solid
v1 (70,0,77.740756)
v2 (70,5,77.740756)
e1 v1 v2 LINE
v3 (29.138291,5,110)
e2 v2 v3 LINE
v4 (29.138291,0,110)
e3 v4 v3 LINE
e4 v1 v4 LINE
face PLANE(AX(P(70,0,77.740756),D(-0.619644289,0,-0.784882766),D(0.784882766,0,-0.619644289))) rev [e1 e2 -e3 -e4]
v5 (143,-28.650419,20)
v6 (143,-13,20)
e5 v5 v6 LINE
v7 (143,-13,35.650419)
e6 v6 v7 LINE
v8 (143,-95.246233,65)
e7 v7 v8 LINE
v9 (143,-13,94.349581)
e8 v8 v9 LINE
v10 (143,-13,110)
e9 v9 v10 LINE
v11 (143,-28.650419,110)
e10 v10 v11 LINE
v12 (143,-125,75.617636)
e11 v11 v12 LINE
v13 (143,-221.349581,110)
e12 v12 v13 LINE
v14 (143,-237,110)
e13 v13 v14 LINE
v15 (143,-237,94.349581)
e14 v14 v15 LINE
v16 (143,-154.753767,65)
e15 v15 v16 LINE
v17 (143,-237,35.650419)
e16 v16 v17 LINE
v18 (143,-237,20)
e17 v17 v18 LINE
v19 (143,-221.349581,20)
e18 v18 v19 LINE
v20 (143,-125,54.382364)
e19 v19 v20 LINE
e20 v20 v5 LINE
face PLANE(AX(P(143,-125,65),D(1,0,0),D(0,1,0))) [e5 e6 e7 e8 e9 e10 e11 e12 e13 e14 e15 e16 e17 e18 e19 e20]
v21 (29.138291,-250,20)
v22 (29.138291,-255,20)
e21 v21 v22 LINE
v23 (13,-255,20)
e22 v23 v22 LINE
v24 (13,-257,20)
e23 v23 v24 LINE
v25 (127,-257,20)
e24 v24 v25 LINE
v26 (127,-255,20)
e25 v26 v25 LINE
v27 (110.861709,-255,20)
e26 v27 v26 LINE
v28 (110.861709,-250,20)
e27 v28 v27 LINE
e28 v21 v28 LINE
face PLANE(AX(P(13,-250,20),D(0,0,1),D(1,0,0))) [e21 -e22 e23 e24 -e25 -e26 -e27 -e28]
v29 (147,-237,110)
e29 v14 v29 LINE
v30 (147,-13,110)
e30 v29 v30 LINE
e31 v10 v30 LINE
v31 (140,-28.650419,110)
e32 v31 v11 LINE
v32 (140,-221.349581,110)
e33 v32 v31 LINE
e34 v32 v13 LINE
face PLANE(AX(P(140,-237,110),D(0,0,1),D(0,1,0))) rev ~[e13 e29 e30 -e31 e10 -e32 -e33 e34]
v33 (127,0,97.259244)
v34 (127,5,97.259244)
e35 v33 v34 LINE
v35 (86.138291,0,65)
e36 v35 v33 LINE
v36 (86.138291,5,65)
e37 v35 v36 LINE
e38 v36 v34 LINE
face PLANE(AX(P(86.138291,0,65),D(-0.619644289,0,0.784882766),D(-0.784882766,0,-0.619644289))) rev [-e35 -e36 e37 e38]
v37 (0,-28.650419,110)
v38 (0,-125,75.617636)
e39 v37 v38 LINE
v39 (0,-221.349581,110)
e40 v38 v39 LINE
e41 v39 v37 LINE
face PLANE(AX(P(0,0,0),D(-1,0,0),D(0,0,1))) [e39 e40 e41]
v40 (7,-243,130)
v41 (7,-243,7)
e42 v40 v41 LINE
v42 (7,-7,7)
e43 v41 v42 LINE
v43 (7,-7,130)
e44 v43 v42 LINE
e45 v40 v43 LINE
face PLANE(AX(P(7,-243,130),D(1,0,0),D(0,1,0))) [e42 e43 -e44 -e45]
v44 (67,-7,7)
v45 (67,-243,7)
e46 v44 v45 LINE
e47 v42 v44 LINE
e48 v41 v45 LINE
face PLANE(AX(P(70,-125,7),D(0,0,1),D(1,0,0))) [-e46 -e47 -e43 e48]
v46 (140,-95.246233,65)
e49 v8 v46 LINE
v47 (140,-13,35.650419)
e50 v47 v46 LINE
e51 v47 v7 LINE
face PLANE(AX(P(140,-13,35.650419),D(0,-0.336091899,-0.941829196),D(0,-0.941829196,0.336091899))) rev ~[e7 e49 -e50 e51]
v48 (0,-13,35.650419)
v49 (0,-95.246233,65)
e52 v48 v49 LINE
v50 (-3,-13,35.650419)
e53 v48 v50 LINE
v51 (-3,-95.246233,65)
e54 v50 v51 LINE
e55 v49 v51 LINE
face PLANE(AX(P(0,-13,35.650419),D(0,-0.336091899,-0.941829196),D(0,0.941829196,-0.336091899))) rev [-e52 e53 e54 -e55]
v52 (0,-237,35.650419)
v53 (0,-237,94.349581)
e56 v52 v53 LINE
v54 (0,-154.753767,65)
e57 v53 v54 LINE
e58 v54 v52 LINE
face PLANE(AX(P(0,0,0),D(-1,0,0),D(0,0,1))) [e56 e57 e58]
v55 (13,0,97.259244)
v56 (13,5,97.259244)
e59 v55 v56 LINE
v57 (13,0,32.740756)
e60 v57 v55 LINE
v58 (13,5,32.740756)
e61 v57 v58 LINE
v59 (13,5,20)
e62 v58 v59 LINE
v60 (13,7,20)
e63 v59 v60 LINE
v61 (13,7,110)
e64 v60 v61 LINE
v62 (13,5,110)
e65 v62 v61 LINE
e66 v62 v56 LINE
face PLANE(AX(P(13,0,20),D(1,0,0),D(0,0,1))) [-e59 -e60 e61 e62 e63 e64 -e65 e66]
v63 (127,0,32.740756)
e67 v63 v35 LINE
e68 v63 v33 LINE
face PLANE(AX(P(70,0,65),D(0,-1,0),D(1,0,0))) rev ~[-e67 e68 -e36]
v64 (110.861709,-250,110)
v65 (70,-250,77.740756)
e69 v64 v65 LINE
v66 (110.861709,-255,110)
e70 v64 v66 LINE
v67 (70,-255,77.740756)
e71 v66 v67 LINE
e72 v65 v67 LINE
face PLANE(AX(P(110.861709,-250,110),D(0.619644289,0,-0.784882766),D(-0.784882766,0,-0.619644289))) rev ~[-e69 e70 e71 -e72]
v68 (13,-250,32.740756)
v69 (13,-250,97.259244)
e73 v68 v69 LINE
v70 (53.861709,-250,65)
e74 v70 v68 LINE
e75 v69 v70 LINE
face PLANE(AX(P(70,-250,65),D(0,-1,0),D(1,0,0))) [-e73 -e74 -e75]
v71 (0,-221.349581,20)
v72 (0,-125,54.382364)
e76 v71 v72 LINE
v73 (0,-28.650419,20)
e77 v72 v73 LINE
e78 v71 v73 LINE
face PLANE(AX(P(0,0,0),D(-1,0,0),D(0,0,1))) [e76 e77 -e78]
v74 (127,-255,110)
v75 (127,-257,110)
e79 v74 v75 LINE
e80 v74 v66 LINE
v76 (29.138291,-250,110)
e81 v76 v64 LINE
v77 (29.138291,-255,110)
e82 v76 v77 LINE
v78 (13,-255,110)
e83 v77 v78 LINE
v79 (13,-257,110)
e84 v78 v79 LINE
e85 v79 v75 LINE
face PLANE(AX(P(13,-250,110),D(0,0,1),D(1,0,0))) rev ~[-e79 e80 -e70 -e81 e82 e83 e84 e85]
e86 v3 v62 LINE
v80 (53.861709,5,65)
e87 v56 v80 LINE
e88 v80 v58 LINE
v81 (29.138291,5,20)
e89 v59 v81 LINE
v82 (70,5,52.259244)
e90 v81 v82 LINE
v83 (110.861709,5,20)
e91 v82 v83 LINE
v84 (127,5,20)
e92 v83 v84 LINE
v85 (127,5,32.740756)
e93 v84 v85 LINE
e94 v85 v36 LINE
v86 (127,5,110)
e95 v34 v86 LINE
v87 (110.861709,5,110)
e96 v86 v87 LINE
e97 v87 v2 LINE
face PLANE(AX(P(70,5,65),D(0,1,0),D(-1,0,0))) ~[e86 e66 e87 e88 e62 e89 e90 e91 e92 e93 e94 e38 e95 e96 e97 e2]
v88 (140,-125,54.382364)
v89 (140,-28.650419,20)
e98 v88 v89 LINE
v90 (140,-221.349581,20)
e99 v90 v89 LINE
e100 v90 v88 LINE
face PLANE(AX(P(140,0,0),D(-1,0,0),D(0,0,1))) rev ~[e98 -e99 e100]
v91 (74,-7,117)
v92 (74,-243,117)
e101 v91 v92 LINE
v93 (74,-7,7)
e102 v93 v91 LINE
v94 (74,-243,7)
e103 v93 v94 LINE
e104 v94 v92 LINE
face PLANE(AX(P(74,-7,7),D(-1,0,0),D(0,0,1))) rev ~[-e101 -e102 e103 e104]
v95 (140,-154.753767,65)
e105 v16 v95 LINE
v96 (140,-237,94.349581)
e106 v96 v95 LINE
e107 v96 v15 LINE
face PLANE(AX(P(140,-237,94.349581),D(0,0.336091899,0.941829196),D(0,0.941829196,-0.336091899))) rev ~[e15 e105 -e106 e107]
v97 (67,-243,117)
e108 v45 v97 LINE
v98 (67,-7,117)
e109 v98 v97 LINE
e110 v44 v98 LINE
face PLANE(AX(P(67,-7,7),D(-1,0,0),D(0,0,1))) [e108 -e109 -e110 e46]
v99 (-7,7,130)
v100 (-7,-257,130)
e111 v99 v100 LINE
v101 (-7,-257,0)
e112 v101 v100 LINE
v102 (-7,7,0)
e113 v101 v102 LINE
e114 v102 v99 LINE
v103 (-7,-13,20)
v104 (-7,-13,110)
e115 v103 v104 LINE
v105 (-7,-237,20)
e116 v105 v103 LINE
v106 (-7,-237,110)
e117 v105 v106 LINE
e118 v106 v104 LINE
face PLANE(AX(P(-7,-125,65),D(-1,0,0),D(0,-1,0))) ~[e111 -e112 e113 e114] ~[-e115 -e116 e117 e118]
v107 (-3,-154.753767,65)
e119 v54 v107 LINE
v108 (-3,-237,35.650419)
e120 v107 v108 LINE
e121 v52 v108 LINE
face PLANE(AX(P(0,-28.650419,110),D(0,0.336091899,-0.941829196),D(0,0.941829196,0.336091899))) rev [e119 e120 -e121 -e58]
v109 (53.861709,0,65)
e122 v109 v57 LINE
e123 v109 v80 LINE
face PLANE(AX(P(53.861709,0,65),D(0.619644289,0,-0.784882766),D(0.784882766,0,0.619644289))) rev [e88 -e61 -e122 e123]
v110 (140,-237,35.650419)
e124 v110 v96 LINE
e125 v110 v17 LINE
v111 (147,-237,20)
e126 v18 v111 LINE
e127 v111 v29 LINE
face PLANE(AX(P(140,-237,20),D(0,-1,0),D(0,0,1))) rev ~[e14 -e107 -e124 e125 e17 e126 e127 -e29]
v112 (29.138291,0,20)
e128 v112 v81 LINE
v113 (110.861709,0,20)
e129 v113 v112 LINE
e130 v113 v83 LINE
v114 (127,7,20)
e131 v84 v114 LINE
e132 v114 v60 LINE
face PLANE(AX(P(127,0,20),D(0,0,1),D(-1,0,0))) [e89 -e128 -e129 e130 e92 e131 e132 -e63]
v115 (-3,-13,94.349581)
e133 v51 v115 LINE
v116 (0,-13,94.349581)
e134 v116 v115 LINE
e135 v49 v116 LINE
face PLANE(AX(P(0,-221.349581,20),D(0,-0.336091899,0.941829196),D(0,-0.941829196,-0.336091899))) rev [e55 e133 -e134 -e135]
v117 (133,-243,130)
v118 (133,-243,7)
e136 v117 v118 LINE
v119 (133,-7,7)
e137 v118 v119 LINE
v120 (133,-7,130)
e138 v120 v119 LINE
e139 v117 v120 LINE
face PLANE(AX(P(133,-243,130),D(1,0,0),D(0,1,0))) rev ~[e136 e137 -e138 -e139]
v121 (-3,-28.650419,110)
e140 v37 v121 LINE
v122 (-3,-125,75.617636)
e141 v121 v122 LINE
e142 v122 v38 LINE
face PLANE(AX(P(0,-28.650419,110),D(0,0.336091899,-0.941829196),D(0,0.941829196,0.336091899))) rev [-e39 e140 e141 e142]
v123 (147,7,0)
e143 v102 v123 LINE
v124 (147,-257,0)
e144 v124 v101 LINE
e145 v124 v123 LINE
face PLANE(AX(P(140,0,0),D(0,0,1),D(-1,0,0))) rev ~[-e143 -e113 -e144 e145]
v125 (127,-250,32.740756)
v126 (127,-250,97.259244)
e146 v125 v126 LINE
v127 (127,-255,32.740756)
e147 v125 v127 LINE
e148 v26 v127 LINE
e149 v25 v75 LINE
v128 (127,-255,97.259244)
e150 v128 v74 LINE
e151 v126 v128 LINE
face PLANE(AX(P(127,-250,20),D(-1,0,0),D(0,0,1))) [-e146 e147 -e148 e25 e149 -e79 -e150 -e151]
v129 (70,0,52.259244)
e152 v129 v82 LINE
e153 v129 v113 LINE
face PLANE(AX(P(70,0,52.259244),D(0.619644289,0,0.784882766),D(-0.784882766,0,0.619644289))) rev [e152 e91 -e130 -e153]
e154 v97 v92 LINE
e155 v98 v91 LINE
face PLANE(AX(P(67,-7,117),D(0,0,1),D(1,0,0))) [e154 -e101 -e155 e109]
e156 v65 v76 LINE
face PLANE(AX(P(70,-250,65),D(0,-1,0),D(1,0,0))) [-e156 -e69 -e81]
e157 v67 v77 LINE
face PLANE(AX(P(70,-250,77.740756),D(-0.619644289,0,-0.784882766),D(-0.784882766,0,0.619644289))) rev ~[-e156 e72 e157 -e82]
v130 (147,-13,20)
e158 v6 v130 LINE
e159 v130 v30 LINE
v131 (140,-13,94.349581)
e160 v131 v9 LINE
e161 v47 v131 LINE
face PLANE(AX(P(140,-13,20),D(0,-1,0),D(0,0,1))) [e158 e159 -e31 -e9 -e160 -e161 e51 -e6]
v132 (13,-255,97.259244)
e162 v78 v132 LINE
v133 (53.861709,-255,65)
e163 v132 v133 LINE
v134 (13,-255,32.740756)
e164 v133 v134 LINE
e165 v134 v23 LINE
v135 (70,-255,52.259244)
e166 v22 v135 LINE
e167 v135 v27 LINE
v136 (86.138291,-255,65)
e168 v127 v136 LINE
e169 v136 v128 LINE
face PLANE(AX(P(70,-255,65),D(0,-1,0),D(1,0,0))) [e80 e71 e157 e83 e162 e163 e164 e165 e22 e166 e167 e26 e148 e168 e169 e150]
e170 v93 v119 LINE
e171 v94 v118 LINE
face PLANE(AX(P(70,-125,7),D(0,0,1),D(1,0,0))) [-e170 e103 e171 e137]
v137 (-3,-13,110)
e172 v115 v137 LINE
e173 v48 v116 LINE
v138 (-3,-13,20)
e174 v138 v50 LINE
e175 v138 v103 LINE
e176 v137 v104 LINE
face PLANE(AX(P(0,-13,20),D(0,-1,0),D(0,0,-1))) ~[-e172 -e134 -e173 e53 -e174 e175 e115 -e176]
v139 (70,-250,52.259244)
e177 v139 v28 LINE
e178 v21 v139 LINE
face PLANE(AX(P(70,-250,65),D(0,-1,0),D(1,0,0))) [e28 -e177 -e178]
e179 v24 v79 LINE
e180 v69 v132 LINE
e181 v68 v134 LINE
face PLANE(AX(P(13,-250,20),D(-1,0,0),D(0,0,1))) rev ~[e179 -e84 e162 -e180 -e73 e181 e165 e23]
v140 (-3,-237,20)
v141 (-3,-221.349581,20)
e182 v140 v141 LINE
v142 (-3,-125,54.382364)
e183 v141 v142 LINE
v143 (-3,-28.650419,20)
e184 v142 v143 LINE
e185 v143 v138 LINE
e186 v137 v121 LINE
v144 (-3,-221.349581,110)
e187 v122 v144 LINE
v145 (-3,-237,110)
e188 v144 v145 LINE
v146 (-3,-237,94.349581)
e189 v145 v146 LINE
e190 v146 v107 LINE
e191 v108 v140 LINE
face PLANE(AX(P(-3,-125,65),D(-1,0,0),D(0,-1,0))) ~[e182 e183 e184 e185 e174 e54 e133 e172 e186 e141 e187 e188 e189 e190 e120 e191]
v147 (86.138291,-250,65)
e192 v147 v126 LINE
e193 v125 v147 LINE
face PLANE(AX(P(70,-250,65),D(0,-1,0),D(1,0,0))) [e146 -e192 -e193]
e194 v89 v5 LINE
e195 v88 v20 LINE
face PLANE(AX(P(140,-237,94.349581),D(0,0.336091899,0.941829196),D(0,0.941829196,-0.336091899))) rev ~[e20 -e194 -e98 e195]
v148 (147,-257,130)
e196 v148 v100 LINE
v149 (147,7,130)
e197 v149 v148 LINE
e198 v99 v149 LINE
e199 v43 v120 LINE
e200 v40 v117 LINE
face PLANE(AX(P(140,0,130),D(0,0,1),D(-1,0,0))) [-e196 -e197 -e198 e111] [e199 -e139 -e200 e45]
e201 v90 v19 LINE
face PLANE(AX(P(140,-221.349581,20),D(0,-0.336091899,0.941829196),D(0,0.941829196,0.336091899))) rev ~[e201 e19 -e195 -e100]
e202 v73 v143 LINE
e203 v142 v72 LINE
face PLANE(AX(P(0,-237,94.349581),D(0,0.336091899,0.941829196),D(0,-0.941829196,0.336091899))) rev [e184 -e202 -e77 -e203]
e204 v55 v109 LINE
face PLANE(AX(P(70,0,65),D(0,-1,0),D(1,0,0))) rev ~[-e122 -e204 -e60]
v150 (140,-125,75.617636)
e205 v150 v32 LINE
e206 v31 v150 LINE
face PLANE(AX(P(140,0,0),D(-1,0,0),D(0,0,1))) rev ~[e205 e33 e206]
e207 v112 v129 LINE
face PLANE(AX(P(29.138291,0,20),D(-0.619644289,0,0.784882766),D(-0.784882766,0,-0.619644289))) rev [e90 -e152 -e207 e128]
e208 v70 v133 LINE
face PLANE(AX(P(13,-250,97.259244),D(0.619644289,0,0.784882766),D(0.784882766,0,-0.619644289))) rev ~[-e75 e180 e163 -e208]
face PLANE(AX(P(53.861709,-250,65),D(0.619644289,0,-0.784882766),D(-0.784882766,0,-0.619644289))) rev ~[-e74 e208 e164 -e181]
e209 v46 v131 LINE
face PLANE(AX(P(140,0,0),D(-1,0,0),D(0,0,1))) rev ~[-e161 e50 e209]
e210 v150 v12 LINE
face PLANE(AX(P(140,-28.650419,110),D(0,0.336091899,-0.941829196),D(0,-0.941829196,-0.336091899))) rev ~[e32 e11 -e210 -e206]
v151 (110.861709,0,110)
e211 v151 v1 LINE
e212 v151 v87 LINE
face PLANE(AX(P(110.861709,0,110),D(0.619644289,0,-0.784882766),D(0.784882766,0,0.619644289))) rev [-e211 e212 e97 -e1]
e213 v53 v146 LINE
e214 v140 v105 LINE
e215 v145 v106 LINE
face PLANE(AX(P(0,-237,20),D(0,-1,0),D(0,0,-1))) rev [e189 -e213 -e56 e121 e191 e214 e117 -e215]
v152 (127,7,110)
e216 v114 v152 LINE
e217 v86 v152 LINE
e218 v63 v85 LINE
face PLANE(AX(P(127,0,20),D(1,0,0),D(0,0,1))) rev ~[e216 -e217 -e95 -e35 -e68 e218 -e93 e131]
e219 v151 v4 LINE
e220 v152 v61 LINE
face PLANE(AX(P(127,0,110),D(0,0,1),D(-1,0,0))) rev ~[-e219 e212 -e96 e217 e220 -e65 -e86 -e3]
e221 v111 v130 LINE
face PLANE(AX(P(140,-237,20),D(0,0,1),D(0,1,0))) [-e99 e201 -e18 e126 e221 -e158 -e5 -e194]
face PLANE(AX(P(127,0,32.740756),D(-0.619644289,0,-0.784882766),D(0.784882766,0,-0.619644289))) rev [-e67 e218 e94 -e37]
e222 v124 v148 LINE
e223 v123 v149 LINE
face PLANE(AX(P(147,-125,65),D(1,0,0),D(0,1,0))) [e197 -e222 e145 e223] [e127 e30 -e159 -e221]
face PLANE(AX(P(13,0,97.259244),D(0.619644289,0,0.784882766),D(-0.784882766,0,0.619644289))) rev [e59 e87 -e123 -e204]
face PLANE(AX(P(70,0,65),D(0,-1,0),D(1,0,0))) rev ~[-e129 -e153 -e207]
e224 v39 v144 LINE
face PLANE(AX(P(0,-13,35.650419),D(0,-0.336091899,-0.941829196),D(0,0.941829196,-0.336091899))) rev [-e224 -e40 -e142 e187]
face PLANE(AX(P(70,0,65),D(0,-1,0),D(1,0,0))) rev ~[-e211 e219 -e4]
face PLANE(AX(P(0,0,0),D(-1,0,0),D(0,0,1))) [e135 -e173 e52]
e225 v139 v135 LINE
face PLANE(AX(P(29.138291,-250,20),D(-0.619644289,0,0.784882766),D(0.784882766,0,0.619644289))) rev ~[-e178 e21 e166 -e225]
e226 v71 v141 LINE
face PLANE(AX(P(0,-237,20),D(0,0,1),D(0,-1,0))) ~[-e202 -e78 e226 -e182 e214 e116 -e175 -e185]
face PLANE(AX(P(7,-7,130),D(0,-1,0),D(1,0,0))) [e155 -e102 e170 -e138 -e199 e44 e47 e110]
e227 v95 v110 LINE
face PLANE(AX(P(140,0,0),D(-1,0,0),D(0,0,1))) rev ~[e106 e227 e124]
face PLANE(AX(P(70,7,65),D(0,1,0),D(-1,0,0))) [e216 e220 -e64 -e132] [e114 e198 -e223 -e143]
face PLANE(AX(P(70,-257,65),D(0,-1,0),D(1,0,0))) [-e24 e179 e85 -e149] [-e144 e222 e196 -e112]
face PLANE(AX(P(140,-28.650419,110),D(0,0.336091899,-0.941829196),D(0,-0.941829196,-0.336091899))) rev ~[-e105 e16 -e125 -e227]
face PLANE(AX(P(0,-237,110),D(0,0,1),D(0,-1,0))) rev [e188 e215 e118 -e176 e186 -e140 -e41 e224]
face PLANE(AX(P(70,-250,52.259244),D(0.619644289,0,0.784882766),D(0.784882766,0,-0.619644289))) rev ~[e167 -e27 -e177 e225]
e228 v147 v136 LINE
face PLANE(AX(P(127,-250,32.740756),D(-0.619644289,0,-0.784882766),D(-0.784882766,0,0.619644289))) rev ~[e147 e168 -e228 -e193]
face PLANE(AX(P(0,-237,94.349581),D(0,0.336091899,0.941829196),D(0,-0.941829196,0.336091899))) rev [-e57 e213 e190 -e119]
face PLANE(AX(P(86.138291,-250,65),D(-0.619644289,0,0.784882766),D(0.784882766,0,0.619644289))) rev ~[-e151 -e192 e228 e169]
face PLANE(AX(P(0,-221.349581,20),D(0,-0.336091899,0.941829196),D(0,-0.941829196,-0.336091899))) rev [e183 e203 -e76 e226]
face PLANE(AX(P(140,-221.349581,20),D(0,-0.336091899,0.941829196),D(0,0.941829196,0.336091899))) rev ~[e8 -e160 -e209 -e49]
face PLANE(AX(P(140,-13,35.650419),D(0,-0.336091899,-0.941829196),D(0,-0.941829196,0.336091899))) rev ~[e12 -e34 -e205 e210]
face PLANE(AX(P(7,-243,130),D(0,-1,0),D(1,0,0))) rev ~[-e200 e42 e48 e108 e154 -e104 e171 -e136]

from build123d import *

# Parameters (mm, degrees)
F0_W      = 140
F0_H      = 130
F1_DEPTH  = 250
F2_W      = 126
F2_H      = 236
F3_DEPTH  = 123
F4_W      = 250
F4_H      = 130
F4_W_2    = 224
F4_H_2    = 90
F4_W_3    = 7
F5_DEPTH  = 7
F7_W      = 140
F7_H      = 130
F7_W_2    = 114
F7_H_2    = 90
F8_DEPTH  = 7
F9_W      = 140
F9_H      = 130
F9_W_2    = 114
F9_H_2    = 90
F10_DEPTH = 7
F12_DEPTH = 3
F14_DEPTH = 3
F15_W     = 7
F15_H     = 110
F16_DEPTH = 236
F18_DEPTH = 5


# Not quite as in the source:
# - a pattern or mirror of a feature is missing from the dataset's text; its kind, count and spacing are read off the source's solid


with BuildPart() as f1:
    # F0 (on Front) → F1 (new body)
    with BuildSketch(Plane.XZ):
        with Locations((70, 65)):
            Rectangle(F0_W, F0_H)
    extrude(amount=F1_DEPTH)

    # F2 (on face) → F3 (cut)
    with BuildSketch(Plane.XY.offset(130)):
        with Locations((70, -125)):
            Rectangle(F2_W, F2_H)
    extrude(amount=-F3_DEPTH, mode=Mode.SUBTRACT)

    # F4 (on face) → F5 (join)
    with BuildSketch(Plane.YZ.offset(140)):
        with Locations((-125, 65)):
            Rectangle(F4_W, F4_H)
        with Locations((-125, 65)):
            Rectangle(F4_W_2, F4_H_2, mode=Mode.SUBTRACT)
        with Locations((-253.5, 65)):
            Rectangle(F4_W_3, F4_H)
        with Locations((3.5, 65)):
            Rectangle(F4_W_3, F4_H)
    f5 = extrude(amount=F5_DEPTH)

    # F5_copies: F5 across plane
    add(f5.mirror(Plane(origin=(70, 0, 0), x_dir=(0, 0, -1), z_dir=(-1, 0, 0))))

    # F7 (on face) → F8 (join)
    with BuildSketch(Plane.XZ.offset(250)):
        with Locations((70, 65)):
            Rectangle(F7_W, F7_H)
        with Locations((70, 65)):
            Rectangle(F7_W_2, F7_H_2, mode=Mode.SUBTRACT)
    extrude(amount=F8_DEPTH)

    # F9 (on face) → F10 (join)
    with BuildSketch(Plane(origin=(0, 0, 0), x_dir=(-1, 0, 0), z_dir=(0, 1, 0))):
        with Locations((-70, 65)):
            Rectangle(F9_W, F9_H)
        with Locations((-70, 65)):
            Rectangle(F9_W_2, F9_H_2, mode=Mode.SUBTRACT)
    extrude(amount=F10_DEPTH)

    # F11 (on face) → F12 (join)
    with BuildSketch(Plane.YZ.offset(140)):
        Polygon((-13, 35.6504185324), (-221.3495814676, 110), (-237, 110), (-237, 94.3495814676), (-28.6504185324, 20), (-13, 20), align=None)
    f12 = extrude(amount=F12_DEPTH)

    # F12_copies: F12 across plane
    add(f12.mirror(Plane(origin=(70, 0, 0), x_dir=(0, 0, -1), z_dir=(-1, 0, 0))))

    # F13 (on face) → F14 (join)
    with BuildSketch(Plane.YZ.offset(140)):
        Polygon((-13, 110), (-28.6504185324, 110), (-237, 35.6504185324), (-237, 20), (-221.3495814676, 20), (-13, 94.3495814676), align=None)
    f14 = extrude(amount=F14_DEPTH)

    # F14_copies: F14 across plane
    add(f14.mirror(Plane(origin=(70, 0, 0), x_dir=(0, 0, -1), z_dir=(-1, 0, 0))))

    # F15 (on face) → F16 (join, through all)
    with BuildSketch(Plane.XZ.offset(7)):
        with Locations((70.5, 62)):
            Rectangle(F15_W, F15_H)
    extrude(amount=F16_DEPTH)

    # F17 (on face) → F18 (join)
    with BuildSketch(Plane.XZ.offset(250)):
        Polygon((70, 77.7407562494), (29.1382912492, 110), (13, 110), (13, 97.2592437506), (53.8617087508, 65), (13, 32.7407562494), (13, 20), (29.1382912492, 20), (70, 52.2592437506), (110.8617087508, 20), (127, 20), (127, 32.7407562494), (86.1382912492, 65), (127, 97.2592437506), (127, 110), (110.8617087508, 110), align=None)
    f18 = extrude(amount=F18_DEPTH)

    # F18_copies: F18 across plane
    add(f18.mirror(Plane.ZX.offset(-125)))


solid = f1.part
